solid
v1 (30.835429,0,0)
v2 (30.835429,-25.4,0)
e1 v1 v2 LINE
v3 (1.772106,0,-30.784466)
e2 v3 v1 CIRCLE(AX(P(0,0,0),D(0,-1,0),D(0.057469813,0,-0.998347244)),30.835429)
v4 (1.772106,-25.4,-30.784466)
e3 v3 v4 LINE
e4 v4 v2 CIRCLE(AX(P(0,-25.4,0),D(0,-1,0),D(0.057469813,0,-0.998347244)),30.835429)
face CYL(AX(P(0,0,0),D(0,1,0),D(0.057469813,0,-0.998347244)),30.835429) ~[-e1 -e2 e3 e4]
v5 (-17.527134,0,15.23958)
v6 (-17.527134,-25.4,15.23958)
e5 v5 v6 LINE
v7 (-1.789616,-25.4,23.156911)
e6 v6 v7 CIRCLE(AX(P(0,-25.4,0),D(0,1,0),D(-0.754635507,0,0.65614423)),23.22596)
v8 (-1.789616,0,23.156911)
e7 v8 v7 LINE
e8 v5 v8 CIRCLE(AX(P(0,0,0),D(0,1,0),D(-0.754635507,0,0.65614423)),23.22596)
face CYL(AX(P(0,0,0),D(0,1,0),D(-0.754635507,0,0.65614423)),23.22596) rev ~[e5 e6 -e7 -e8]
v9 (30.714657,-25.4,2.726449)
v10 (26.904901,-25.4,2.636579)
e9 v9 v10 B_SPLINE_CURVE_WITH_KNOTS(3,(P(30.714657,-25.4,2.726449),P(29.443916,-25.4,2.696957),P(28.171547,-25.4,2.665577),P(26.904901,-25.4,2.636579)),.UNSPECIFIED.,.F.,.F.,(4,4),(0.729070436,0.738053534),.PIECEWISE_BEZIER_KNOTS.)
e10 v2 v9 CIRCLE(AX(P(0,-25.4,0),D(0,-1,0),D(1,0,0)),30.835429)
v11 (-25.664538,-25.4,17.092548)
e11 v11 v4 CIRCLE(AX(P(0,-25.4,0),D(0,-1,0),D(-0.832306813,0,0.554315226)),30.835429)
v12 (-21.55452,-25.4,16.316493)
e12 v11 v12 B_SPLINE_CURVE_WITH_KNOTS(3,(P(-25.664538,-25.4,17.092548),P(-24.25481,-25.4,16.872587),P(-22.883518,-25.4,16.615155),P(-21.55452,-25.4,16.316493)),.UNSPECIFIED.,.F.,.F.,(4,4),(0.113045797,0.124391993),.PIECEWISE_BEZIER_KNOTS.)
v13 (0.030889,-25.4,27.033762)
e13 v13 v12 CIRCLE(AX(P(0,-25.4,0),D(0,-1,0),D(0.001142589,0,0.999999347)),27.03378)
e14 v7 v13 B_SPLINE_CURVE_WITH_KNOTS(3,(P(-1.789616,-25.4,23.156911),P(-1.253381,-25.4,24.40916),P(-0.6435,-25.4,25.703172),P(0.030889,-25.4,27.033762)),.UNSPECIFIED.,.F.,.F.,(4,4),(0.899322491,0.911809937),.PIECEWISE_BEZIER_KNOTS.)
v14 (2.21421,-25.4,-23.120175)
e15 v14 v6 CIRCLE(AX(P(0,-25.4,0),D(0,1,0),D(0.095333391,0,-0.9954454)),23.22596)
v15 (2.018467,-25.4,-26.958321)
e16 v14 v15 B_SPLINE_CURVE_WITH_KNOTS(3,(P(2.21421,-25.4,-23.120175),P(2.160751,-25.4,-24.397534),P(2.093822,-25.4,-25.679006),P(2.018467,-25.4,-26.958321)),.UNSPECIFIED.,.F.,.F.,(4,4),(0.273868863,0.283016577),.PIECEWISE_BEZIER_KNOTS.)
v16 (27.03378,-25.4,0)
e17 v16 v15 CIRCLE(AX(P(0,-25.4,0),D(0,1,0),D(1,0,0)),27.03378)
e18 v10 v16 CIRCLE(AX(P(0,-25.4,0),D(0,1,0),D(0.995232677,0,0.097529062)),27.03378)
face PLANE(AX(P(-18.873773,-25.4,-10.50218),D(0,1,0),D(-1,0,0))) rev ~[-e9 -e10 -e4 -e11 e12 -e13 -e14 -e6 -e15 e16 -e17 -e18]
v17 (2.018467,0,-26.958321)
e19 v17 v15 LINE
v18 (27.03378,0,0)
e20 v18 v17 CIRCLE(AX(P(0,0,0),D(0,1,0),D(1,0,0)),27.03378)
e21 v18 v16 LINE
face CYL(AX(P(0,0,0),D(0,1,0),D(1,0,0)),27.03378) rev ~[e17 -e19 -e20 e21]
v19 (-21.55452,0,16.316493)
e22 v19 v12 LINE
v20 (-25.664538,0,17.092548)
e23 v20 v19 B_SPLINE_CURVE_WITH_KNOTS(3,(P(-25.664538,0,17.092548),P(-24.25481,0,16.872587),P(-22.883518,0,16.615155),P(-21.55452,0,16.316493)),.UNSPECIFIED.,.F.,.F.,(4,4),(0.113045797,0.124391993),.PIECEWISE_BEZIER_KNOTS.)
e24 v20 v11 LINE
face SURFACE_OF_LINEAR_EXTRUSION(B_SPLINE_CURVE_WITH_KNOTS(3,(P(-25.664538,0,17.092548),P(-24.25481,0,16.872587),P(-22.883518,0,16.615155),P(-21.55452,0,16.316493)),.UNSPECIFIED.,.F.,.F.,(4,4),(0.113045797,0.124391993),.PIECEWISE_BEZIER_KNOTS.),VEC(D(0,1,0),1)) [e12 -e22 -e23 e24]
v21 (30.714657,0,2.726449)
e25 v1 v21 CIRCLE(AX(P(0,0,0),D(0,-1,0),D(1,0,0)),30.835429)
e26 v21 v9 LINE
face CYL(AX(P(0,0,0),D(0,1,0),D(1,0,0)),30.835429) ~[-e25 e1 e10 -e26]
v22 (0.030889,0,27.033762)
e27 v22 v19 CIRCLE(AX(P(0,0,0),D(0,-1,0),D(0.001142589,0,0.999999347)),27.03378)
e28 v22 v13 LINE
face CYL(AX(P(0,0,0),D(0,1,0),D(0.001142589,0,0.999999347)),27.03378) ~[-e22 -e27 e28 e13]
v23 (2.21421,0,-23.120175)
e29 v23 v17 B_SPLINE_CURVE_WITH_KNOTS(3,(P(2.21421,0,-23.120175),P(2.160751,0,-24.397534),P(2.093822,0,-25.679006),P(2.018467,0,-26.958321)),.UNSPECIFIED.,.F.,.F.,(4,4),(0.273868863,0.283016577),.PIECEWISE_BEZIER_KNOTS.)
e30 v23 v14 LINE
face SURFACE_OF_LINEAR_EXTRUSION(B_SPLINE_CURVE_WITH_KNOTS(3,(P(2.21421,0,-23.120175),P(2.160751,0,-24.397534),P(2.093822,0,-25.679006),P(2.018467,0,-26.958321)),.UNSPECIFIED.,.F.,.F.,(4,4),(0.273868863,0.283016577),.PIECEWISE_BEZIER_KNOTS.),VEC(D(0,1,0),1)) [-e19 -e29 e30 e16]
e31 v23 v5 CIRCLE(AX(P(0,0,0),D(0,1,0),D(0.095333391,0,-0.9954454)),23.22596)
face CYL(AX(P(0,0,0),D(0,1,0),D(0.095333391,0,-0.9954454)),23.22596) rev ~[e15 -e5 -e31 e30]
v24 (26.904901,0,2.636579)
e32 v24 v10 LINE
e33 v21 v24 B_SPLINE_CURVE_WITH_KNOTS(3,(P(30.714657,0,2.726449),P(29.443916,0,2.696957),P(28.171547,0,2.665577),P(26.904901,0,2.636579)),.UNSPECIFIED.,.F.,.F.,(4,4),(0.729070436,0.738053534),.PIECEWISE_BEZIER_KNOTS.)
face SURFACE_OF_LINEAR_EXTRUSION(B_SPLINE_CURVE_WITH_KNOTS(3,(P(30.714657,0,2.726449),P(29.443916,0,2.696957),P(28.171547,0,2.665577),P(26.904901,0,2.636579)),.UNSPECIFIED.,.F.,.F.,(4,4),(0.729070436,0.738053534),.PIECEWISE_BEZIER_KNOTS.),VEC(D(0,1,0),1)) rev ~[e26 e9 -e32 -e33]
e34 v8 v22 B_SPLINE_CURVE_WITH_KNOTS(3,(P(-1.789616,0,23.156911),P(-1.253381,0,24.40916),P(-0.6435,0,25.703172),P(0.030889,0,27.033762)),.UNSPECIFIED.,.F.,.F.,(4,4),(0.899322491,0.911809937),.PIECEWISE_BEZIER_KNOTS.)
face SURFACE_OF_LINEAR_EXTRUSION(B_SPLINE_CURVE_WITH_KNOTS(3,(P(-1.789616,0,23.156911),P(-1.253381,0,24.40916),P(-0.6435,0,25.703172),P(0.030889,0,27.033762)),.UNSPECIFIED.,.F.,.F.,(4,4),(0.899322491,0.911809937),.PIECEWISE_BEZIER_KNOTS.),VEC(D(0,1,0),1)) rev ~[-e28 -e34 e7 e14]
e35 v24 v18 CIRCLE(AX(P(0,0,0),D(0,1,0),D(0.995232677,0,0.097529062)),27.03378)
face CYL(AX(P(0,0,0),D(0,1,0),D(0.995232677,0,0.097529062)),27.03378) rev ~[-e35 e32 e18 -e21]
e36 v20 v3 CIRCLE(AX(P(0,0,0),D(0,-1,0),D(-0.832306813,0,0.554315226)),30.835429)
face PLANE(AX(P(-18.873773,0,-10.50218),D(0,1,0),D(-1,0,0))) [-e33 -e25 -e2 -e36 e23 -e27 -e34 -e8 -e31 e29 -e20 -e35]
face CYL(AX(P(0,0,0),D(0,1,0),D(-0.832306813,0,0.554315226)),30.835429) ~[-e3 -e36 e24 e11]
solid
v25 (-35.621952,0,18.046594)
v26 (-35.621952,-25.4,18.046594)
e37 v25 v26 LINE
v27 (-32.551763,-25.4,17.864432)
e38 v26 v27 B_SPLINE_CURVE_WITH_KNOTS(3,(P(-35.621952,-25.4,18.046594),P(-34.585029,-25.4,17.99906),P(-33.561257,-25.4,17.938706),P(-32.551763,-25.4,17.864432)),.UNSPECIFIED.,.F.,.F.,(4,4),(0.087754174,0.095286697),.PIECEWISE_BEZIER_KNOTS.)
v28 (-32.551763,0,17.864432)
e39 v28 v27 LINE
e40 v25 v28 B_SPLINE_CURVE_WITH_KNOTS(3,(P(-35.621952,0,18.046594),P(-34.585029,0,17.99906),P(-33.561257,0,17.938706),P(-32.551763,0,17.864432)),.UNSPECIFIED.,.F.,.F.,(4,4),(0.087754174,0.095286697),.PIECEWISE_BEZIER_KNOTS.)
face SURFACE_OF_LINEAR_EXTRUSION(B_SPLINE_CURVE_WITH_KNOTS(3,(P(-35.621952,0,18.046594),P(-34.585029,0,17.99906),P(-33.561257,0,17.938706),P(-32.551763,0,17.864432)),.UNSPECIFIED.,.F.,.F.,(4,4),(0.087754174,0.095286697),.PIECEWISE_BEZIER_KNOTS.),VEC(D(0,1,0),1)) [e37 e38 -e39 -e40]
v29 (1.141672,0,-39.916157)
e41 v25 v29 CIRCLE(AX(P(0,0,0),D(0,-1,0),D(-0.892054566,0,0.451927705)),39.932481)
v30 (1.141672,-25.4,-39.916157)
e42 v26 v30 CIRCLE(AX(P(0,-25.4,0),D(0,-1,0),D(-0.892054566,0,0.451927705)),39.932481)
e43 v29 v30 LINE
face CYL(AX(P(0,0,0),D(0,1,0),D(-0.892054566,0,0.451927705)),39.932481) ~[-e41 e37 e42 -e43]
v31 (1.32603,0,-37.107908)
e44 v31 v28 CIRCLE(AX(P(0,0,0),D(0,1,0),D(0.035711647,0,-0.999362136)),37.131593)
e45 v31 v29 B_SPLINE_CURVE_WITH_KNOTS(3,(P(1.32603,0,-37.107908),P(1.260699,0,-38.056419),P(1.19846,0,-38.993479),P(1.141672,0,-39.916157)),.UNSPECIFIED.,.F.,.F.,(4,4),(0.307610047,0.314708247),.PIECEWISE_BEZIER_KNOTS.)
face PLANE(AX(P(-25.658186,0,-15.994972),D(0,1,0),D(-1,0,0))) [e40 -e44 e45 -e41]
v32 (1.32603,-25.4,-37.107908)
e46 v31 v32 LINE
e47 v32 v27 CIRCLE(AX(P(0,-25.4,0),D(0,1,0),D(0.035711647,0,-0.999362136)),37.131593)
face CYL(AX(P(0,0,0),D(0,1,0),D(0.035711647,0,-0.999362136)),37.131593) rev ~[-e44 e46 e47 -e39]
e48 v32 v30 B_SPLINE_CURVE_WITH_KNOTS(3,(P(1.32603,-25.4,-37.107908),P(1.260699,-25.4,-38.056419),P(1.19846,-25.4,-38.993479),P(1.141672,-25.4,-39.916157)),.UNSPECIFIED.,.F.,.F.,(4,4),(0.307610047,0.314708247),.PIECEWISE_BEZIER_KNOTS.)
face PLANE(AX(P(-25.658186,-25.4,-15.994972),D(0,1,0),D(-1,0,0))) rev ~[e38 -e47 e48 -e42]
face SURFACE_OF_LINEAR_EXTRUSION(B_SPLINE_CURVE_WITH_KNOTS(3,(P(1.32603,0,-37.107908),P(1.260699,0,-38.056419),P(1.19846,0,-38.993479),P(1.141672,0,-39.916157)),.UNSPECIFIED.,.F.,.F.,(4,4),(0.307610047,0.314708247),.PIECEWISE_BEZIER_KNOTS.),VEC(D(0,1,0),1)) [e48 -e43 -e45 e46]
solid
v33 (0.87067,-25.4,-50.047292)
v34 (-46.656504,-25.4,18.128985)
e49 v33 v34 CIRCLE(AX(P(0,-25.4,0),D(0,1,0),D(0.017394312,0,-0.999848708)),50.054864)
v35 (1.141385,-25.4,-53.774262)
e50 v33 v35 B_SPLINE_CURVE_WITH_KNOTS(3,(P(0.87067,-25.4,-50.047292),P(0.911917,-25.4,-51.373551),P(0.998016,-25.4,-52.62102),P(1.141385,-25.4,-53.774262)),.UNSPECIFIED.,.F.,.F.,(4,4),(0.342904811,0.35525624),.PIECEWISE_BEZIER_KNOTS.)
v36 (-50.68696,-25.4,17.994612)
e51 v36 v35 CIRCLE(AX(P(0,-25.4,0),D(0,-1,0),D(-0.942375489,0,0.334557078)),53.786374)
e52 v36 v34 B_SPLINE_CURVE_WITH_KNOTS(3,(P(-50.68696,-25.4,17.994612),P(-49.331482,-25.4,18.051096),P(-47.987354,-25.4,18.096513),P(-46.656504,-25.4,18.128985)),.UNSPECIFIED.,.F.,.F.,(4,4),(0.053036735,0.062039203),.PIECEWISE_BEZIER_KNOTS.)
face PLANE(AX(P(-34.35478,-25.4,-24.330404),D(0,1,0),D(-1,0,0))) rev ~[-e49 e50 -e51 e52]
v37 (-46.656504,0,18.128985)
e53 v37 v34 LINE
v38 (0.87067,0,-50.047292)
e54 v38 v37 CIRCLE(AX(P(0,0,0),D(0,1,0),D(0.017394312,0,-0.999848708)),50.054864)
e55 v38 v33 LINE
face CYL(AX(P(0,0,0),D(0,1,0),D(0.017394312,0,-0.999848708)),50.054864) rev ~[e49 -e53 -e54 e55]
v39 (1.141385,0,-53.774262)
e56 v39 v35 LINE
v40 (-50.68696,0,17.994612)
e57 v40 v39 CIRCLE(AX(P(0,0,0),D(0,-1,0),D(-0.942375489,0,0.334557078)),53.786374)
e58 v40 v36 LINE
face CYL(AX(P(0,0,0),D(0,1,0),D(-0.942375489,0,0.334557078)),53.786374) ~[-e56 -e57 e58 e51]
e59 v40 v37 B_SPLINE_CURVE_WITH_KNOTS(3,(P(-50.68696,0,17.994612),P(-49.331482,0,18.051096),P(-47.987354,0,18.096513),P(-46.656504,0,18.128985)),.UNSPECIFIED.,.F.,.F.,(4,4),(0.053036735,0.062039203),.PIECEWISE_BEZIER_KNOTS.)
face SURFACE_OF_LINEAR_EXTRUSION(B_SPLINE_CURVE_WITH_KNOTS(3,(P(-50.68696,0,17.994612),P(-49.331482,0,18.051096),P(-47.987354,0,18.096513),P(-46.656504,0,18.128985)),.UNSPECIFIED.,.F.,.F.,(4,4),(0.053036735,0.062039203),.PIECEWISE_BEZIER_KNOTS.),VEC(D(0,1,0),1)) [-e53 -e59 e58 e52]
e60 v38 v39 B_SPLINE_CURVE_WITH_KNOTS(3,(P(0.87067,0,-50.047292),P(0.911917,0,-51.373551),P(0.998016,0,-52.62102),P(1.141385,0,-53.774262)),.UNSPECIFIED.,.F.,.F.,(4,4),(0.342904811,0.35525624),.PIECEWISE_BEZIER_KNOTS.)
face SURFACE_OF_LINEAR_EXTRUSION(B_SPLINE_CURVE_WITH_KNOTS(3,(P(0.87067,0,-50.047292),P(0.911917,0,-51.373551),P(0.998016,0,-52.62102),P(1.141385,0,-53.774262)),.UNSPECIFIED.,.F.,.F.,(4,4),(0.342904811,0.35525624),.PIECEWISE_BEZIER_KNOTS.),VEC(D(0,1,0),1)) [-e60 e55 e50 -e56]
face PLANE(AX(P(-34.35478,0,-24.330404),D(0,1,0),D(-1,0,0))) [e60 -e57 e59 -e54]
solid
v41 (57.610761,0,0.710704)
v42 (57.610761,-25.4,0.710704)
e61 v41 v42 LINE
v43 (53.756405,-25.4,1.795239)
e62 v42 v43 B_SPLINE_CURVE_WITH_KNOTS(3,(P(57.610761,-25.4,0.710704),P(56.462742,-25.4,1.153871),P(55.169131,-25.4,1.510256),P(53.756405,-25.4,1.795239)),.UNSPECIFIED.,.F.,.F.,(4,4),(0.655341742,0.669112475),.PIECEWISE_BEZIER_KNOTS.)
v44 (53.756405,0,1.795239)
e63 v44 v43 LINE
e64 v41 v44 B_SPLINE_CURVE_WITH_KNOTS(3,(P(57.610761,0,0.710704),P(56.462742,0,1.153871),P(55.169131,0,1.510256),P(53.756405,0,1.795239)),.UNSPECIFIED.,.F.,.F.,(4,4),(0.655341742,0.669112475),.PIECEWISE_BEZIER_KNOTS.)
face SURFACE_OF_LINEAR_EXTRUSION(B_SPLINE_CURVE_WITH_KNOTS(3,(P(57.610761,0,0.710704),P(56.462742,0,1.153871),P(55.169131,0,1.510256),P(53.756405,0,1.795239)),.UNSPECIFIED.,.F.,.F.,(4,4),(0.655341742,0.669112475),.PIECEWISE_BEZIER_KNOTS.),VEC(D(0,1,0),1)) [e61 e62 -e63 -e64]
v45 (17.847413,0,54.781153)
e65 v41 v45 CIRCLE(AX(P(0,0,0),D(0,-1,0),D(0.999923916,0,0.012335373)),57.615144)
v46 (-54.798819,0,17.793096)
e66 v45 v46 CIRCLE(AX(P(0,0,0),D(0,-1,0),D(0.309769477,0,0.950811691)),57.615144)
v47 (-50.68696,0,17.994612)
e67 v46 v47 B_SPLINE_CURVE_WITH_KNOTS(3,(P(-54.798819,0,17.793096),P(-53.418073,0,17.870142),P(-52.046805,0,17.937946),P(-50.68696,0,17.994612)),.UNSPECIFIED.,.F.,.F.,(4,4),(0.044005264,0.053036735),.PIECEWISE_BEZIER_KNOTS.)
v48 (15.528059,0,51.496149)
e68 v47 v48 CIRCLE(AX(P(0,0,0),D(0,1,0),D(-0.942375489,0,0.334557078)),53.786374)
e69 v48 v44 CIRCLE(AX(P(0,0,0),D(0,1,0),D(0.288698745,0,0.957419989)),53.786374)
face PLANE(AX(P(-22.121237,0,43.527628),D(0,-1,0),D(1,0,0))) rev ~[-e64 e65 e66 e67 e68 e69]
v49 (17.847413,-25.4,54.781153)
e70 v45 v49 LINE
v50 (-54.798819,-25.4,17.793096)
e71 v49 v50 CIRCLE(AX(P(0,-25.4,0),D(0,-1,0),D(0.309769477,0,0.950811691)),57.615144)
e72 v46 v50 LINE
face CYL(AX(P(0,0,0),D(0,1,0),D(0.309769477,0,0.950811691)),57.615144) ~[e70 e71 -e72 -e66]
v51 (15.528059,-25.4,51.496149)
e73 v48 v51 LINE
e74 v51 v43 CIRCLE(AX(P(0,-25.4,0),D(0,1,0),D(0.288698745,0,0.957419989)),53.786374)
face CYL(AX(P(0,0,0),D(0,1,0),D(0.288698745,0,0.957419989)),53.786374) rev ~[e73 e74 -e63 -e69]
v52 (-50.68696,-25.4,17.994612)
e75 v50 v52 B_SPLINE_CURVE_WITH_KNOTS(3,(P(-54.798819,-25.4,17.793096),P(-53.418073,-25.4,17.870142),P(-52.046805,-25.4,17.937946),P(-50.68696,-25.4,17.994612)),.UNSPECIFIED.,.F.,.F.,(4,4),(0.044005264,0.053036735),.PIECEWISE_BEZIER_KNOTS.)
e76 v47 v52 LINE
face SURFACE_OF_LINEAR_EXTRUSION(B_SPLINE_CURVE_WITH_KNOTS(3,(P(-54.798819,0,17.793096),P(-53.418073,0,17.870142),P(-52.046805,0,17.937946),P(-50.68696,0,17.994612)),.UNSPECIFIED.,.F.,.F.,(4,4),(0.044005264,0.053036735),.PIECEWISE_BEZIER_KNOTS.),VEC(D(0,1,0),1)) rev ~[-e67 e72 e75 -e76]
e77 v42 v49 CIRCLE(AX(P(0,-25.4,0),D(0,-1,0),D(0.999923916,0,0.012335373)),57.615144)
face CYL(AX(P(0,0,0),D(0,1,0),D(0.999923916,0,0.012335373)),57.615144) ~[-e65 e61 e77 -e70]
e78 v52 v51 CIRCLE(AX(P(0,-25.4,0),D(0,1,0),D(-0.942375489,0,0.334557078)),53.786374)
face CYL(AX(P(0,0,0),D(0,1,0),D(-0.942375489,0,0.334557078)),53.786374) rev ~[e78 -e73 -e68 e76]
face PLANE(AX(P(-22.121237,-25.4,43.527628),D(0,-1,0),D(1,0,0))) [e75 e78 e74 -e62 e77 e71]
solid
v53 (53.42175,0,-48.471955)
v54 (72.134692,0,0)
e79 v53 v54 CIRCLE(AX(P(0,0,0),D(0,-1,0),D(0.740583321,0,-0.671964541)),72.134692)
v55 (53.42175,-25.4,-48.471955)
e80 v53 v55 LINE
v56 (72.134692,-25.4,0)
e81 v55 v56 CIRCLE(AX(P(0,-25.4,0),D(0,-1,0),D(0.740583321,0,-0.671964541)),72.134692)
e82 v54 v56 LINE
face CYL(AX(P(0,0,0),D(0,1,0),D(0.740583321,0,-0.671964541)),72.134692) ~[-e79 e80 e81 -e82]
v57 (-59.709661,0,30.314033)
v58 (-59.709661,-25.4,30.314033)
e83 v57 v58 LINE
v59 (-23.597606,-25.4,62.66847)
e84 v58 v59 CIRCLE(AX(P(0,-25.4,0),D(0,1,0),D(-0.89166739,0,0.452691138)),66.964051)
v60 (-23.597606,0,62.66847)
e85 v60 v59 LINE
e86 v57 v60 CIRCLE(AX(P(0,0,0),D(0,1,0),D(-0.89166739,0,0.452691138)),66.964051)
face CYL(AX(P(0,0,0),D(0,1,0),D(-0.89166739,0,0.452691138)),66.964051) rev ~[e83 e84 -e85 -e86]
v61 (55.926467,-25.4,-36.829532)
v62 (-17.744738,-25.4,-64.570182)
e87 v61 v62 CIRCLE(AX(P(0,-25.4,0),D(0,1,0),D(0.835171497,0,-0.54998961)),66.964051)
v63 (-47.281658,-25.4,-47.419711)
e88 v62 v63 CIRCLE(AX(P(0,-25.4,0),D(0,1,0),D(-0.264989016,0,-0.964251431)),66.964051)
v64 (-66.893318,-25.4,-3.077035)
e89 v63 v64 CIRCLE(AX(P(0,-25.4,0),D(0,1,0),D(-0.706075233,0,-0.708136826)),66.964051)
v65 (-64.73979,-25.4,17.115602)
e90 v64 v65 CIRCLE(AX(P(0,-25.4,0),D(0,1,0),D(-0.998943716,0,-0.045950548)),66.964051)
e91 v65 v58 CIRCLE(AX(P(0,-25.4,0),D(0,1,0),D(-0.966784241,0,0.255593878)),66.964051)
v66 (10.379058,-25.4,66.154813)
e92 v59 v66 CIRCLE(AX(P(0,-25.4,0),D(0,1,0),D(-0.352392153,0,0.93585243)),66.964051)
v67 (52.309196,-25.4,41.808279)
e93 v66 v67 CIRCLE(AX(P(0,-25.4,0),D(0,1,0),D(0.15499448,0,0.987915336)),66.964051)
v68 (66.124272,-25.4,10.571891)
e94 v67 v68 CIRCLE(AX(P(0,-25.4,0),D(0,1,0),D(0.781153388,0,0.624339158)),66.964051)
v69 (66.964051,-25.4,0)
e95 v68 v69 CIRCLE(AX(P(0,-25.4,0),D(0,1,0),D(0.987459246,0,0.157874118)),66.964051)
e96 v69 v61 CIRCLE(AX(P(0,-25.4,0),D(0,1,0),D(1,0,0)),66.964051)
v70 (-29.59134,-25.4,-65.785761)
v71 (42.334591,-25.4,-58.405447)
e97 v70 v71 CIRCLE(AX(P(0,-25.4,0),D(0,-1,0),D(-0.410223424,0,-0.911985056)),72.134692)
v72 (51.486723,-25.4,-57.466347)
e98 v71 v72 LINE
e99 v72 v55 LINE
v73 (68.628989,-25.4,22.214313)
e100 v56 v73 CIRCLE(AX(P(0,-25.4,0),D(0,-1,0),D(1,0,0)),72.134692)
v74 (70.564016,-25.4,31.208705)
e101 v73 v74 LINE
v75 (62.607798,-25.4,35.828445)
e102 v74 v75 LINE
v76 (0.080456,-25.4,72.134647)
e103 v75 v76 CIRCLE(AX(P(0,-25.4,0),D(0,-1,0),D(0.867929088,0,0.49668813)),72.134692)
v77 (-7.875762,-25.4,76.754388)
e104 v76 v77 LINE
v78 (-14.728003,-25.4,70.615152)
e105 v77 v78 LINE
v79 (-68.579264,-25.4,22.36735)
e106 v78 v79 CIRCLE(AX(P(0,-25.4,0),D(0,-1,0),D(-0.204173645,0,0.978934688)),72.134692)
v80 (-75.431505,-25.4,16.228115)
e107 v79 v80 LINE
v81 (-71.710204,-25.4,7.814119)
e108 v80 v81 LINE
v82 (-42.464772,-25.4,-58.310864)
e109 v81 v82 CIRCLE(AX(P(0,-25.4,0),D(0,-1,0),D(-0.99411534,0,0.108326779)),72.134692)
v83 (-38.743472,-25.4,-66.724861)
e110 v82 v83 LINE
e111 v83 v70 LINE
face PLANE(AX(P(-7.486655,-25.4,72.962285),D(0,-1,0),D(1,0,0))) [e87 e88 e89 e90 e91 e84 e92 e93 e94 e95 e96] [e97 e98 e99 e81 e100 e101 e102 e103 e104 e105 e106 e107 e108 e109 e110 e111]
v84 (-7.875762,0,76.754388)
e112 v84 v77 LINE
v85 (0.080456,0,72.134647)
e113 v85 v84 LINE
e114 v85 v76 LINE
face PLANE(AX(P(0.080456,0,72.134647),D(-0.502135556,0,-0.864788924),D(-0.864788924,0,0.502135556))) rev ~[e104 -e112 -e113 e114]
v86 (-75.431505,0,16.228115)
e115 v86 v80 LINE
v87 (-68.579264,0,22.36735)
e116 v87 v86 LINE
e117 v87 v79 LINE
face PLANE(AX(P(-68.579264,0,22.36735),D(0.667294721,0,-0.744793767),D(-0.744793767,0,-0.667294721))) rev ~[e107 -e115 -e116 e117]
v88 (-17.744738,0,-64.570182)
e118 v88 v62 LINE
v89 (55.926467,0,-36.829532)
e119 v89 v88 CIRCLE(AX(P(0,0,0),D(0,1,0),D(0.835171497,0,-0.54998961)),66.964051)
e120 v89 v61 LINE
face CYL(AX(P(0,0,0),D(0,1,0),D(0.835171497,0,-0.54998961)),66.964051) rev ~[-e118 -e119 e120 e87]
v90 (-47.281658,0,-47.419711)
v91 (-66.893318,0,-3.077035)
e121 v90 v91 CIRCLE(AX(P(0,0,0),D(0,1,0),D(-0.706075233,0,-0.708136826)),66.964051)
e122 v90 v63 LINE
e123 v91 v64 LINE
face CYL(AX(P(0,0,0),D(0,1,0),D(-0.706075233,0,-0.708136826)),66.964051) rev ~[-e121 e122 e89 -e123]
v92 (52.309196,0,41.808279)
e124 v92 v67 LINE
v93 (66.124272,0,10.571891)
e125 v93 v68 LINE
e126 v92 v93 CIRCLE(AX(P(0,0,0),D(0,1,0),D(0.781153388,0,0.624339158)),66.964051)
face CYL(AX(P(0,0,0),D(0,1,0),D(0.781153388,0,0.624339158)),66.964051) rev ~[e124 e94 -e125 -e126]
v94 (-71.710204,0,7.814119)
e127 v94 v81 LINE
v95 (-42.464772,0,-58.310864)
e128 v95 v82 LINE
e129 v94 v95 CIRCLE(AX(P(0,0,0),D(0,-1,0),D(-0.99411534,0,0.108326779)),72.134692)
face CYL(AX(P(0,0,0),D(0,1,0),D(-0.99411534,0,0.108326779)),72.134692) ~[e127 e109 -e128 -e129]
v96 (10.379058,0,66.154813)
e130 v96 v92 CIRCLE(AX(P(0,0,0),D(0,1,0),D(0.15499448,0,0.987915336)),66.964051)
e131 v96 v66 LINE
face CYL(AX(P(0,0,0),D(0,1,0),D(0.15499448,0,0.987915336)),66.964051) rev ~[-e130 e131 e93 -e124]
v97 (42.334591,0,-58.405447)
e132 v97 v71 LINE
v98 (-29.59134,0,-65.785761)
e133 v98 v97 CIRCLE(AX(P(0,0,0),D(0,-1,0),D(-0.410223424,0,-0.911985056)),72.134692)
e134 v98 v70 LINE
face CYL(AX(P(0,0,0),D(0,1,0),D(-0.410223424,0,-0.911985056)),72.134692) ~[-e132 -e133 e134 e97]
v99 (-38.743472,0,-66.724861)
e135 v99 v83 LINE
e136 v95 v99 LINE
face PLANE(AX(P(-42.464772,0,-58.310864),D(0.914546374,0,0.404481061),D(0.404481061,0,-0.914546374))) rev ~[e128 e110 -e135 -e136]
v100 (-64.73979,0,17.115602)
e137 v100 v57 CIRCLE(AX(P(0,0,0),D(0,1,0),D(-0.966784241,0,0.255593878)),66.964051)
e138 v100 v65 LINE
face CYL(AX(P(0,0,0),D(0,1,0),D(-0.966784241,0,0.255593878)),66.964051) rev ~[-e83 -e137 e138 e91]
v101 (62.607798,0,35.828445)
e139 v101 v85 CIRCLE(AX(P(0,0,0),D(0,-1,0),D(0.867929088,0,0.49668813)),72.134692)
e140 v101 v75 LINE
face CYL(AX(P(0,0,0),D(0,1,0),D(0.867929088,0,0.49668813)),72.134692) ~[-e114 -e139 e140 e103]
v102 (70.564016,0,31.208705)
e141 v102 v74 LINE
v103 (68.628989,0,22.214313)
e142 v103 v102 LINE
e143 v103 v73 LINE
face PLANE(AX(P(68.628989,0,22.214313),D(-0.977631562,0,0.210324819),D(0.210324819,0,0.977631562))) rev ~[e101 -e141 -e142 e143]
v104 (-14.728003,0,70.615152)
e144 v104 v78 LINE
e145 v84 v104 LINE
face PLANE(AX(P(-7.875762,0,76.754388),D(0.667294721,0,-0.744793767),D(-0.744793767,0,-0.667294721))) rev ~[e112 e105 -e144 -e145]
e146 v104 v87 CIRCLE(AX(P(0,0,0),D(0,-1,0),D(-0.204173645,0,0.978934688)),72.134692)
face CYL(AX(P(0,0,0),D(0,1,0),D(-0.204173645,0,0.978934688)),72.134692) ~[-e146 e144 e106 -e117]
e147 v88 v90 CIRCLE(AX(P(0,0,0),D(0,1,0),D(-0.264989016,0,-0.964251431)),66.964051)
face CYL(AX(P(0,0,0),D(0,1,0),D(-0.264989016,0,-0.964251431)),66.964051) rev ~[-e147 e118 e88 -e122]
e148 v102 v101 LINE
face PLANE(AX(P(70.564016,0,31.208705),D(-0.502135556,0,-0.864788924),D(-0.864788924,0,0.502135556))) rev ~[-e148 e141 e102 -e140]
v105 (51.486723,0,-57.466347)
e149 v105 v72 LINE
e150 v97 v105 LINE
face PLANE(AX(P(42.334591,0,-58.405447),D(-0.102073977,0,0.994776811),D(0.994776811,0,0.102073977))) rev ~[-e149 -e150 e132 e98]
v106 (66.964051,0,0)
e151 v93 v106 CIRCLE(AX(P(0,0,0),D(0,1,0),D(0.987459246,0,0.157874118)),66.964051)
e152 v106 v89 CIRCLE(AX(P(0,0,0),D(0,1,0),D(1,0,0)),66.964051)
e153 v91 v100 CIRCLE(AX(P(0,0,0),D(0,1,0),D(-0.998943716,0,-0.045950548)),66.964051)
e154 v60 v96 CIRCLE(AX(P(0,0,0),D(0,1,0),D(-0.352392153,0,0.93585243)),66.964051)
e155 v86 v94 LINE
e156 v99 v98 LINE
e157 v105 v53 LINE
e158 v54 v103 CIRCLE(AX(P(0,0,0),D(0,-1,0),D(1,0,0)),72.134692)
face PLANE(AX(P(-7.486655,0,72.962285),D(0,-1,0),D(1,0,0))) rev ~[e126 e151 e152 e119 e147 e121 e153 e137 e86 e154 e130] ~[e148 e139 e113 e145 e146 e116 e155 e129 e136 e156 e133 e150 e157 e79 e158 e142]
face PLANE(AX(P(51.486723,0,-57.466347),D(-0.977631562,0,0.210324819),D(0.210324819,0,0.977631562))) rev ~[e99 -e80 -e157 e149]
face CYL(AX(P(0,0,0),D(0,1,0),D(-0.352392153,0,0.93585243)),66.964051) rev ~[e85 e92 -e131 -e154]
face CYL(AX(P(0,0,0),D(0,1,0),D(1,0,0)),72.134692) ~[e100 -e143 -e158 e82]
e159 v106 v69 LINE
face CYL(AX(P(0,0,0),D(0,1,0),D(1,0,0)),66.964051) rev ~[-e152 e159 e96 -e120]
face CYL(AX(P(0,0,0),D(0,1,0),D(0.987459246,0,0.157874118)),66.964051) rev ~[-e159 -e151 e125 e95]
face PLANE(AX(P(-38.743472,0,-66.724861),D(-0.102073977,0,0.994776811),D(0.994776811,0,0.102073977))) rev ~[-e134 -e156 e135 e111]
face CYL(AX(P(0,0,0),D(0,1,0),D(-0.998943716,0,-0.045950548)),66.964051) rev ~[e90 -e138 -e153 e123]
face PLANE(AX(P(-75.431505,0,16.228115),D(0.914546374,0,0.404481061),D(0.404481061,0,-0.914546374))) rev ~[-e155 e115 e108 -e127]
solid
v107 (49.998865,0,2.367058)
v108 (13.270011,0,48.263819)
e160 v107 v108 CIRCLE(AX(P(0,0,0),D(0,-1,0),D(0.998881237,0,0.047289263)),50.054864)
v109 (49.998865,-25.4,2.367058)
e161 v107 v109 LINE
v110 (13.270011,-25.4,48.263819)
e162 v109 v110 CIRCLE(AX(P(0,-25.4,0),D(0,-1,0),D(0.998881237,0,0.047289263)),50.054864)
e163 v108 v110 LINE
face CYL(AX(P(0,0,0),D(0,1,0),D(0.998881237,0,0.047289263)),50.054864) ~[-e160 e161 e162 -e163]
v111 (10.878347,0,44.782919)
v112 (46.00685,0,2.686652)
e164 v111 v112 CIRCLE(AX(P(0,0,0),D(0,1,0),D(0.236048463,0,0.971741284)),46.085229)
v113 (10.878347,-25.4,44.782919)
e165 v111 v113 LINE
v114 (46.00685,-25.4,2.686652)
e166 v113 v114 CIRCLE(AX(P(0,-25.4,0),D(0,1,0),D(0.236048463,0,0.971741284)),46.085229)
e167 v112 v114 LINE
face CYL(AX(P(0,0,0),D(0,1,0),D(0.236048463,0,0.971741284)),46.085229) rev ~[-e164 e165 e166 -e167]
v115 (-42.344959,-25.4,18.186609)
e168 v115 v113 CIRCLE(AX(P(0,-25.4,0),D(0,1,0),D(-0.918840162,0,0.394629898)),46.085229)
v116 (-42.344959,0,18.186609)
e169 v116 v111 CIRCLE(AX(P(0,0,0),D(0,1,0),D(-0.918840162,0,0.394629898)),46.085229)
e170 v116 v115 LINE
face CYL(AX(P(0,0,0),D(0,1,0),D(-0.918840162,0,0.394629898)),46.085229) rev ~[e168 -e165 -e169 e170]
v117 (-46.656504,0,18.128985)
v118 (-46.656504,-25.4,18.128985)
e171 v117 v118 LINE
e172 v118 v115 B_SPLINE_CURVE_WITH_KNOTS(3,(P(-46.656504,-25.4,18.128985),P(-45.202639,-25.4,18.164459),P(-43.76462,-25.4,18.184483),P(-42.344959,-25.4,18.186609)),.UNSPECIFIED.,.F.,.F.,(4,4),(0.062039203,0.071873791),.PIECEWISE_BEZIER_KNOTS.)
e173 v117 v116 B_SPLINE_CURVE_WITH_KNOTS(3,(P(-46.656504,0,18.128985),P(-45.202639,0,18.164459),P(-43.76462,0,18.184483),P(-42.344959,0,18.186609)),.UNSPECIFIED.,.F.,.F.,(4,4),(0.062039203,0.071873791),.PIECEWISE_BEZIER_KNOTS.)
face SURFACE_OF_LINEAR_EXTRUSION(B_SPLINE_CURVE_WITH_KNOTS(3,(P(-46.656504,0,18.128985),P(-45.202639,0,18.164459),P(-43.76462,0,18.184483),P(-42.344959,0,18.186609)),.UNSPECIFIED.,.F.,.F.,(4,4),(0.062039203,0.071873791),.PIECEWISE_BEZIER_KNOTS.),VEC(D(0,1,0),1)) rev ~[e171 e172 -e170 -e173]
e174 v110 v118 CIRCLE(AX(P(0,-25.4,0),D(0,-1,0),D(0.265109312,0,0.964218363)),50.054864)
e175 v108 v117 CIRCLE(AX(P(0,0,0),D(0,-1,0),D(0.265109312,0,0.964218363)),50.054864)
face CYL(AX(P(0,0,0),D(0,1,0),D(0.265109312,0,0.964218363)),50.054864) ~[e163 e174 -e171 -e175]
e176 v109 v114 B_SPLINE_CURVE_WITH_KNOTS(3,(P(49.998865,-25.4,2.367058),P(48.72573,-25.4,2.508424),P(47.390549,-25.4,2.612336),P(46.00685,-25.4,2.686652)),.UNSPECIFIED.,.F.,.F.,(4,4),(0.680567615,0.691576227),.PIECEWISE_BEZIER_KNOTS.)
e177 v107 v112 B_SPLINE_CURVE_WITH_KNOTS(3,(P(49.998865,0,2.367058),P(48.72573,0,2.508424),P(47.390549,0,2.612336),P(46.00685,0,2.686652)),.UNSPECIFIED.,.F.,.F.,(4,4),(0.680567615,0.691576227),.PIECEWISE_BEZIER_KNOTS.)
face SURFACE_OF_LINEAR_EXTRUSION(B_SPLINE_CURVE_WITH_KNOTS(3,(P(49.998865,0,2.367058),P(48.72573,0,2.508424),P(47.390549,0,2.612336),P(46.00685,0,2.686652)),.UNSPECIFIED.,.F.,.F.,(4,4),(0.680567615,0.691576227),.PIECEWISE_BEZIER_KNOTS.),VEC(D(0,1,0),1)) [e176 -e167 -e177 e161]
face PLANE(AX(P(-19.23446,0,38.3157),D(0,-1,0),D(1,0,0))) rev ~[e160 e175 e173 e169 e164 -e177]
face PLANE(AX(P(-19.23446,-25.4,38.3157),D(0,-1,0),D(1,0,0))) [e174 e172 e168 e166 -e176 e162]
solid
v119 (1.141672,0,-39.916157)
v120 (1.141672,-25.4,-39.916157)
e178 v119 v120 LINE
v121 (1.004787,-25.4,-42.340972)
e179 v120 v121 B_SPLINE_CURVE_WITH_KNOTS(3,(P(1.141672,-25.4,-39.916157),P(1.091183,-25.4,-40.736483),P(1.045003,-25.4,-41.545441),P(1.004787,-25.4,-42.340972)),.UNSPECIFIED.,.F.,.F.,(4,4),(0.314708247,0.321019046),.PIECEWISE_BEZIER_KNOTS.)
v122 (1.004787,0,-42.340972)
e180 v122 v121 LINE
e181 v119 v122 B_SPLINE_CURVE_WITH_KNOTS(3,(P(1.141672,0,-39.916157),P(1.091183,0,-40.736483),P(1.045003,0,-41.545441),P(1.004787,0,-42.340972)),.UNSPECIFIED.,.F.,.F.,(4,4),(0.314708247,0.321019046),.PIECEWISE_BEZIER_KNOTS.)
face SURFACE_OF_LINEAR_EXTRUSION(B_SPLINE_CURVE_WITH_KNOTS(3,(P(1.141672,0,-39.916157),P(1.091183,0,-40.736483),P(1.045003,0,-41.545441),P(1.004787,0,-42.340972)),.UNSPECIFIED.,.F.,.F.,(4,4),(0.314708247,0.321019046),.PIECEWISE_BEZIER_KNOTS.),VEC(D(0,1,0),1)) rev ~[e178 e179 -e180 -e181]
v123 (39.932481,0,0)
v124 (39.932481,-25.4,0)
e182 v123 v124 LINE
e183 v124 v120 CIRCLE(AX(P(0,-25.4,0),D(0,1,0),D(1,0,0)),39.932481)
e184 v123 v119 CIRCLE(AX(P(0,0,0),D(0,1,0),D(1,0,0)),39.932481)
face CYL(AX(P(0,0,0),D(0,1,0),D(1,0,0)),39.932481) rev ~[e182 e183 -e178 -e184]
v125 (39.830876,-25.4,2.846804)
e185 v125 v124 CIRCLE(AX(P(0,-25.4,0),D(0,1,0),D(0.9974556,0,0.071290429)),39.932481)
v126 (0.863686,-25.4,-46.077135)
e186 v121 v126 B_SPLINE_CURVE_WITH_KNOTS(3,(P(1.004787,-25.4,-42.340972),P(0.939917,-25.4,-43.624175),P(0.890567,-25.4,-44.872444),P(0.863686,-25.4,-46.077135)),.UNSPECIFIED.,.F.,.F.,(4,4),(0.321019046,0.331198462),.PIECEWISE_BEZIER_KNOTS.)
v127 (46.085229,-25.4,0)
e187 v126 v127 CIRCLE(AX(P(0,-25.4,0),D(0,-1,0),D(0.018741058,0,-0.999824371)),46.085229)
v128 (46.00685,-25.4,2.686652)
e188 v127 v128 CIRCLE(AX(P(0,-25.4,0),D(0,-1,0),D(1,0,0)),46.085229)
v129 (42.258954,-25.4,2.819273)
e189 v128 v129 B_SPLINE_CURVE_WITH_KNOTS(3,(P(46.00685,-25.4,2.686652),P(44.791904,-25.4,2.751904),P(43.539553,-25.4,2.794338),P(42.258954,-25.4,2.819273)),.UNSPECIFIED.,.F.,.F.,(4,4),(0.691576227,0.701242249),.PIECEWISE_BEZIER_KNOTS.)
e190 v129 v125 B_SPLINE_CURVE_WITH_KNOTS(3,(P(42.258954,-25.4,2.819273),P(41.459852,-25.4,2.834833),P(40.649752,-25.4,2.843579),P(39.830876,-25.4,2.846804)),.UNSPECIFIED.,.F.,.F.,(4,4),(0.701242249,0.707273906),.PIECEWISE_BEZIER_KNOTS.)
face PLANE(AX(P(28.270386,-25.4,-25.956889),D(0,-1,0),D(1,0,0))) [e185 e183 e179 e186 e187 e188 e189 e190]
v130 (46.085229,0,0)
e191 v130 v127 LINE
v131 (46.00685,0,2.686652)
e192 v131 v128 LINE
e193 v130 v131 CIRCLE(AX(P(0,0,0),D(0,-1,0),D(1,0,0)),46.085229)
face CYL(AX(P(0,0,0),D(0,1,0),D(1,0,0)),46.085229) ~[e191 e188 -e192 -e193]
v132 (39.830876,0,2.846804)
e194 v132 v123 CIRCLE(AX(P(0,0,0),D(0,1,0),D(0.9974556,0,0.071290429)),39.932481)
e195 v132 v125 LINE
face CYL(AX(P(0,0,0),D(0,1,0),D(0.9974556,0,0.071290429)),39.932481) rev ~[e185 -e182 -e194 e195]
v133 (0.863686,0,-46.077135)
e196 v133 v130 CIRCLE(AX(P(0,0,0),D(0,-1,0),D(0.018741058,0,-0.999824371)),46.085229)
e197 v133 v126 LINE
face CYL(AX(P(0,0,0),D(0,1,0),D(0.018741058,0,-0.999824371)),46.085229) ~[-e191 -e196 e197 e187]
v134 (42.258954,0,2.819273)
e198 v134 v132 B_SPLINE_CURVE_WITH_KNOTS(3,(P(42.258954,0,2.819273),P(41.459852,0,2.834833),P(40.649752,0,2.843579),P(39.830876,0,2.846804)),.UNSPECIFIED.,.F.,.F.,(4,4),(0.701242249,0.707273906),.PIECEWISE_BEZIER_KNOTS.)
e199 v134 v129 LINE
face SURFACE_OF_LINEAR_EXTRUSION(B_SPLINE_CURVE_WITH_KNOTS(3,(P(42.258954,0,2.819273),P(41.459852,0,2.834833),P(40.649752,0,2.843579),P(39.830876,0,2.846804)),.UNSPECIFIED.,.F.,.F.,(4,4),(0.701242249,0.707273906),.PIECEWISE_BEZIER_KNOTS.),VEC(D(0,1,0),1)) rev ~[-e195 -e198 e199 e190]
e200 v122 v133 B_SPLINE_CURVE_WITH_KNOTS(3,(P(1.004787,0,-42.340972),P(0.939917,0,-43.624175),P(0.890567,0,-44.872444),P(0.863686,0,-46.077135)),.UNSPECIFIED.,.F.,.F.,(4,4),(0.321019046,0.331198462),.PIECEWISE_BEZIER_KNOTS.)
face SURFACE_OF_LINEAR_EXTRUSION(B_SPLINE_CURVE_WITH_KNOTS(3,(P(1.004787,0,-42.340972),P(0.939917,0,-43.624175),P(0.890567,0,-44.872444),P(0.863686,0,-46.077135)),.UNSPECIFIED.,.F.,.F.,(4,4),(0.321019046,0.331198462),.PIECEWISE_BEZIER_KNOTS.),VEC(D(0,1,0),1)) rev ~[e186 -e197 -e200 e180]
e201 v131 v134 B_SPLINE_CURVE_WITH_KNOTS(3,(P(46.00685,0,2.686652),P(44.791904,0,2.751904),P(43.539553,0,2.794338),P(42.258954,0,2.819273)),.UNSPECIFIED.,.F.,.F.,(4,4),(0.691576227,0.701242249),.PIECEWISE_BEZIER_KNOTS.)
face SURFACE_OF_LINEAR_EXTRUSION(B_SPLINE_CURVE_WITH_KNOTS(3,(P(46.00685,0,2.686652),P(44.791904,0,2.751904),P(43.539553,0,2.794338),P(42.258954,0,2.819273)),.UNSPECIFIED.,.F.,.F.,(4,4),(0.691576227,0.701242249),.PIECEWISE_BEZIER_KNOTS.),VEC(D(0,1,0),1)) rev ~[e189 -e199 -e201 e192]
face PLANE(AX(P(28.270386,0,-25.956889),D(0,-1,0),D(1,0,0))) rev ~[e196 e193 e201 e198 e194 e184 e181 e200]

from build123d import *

# Parameters (mm, degrees)
F1_DEPTH = 25.4


with BuildPart() as f1:
    # F0 (on Front) → F1 (new body)
    with BuildSketch(Plane.XZ):
        with BuildLine():
            Line((0.0804563043, 72.1346472531), (-7.8757622136, 76.7543875159))
            Line((-7.8757622136, 76.7543875159), (-14.7280030271, 70.6151523001))
            ThreePointArc((-14.7280030271, 70.6151523001), (-7.3630749336, 71.7579189711), (0.0804563043, 72.1346472531))
        make_face()
        with BuildLine():
            ThreePointArc((62.6077975156, 35.8284453721), (36.2213937543, 62.3812827861), (0.0804563043, 72.1346472531))
            Line((0.0804563043, 72.1346472531), (10.379058307, 66.1548132131))
            ThreePointArc((10.379058307, 66.1548132131), (33.6250311343, 57.9097698478), (52.3091955129, 41.808279412))
            Line((52.3091955129, 41.808279412), (62.6077975156, 35.8284453721))
        make_face()
        with BuildLine():
            Line((10.379058307, 66.1548132131), (0.0804563043, 72.1346472531))
            ThreePointArc((0.0804563043, 72.1346472531), (-7.3630749336, 71.7579189711), (-14.7280030271, 70.6151523001))
            Line((-14.7280030271, 70.6151523001), (-23.5976061943, 62.6684700986))
            ThreePointArc((-23.5976061943, 62.6684700986), (-6.8352870562, 66.6142853558), (10.379058307, 66.1548132131))
        make_face()
        with BuildLine():
            Line((-23.5976061943, 62.6684700986), (-14.7280030271, 70.6151523001))
            ThreePointArc((-14.7280030271, 70.6151523001), (-48.1350992585, 53.7254690711), (-68.5792639553, 22.3673503769))
            Line((-68.5792639553, 22.3673503769), (-59.7096607881, 30.3140325785))
            ThreePointArc((-59.7096607881, 30.3140325785), (-44.684757914, 49.8744079942), (-23.5976061943, 62.6684700986))
        make_face()
        with BuildLine():
            ThreePointArc((68.628988686, 22.214313392), (65.9705211479, 29.1771168386), (62.6077975156, 35.8284453721))
            Line((62.6077975156, 35.8284453721), (52.3091955129, 41.808279412))
            ThreePointArc((52.3091955129, 41.808279412), (61.2417303042, 27.0856905386), (66.1242715931, 10.5718905067))
            Line((66.1242715931, 10.5718905067), (68.628988686, 22.214313392))
        make_face()
        with BuildLine():
            Line((70.5640160335, 31.2087051093), (62.6077975156, 35.8284453721))
            ThreePointArc((62.6077975156, 35.8284453721), (65.9705211479, 29.1771168386), (68.628988686, 22.214313392))
            Line((68.628988686, 22.214313392), (70.5640160335, 31.2087051093))
        make_face()
        with BuildLine():
            ThreePointArc((-70.1811130337, 16.6740871082), (-69.4385618169, 19.5371425839), (-68.5792639553, 22.3673503769))
            Line((-68.5792639553, 22.3673503769), (-75.4315047689, 16.2281151612))
            add(Edge.make_bspline(
                [(-75.4315047689, 16.2281151612), (-73.6801810781, 16.3779407802), (-71.9288512089, 16.5277670762), (-70.1811130337, 16.6740871082)],
                knots=[0, 0, 0, 0, 0.0110848613, 0.0110848613, 0.0110848613, 0.0110848613], degree=3))
        make_face()
        with BuildLine():
            Line((-59.7096607881, 30.3140325785), (-68.5792639553, 22.3673503769))
            ThreePointArc((-68.5792639553, 22.3673503769), (-69.4385618169, 19.5371425839), (-70.1811130337, 16.6740871082))
            add(Edge.make_bspline(
                [(-70.1811130337, 16.6740871082), (-68.362095804, 16.8263745979), (-66.5469692067, 16.9748639956), (-64.7397895139, 17.1156015464)],
                knots=[0.0110848613, 0.0110848613, 0.0110848613, 0.0110848613, 0.0226218032, 0.0226218032, 0.0226218032, 0.0226218032], degree=3))
            ThreePointArc((-64.7397895139, 17.1156015464), (-62.5736850885, 23.8478111585), (-59.7096607881, 30.3140325785))
        make_face()
        with BuildLine():
            ThreePointArc((72.134692122, 0), (71.2528763526, 11.2446173352), (68.628988686, 22.214313392))
            Line((68.628988686, 22.214313392), (66.1242715931, 10.5718905067))
            ThreePointArc((66.1242715931, 10.5718905067), (66.7537762071, 5.3025960338), (66.9640512708, 0))
            ThreePointArc((66.9640512708, 0), (64.145330939, -19.223961125), (55.9264669455, -36.8295324108))
            Line((55.9264669455, -36.8295324108), (53.4217498526, -48.4719552961))
            ThreePointArc((53.4217498526, -48.4719552961), (67.2940386876, -25.9793411127), (72.134692122, 0))
        make_face()
        with BuildLine():
            add(Edge.make_bspline(
                [(-75.4315047689, 16.2281151612), (-73.6801810781, 16.3779407802), (-71.9288512089, 16.5277670762), (-70.1811130337, 16.6740871082)],
                knots=[0, 0, 0, 0, 0.0110848613, 0.0110848613, 0.0110848613, 0.0110848613], degree=3))
            Line((-75.4315047689, 16.2281151612), (-71.7102039728, 7.8141188702))
            ThreePointArc((-71.7102039728, 7.8141188702), (-71.0838323373, 12.2679496162), (-70.1811130337, 16.6740871082))
        make_face()
        with BuildLine():
            add(Edge.make_bspline(
                [(-70.1811130337, 16.6740871082), (-68.362095804, 16.8263745979), (-66.5469692067, 16.9748639956), (-64.7397895139, 17.1156015464)],
                knots=[0.0110848613, 0.0110848613, 0.0110848613, 0.0110848613, 0.0226218032, 0.0226218032, 0.0226218032, 0.0226218032], degree=3))
            ThreePointArc((-70.1811130337, 16.6740871082), (-71.0838323373, 12.2679496162), (-71.7102039728, 7.8141188702))
            Line((-71.7102039728, 7.8141188702), (-66.8933181941, -3.0770348681))
            ThreePointArc((-66.8933181941, -3.0770348681), (-66.5864430839, 7.1013914157), (-64.7397895139, 17.1156015464))
        make_face()
        with BuildLine():
            Line((-66.8933181941, -3.0770348681), (-71.7102039728, 7.8141188702))
            ThreePointArc((-71.7102039728, 7.8141188702), (-65.9705211479, -29.1771168386), (-42.4647723522, -58.3108644818))
            Line((-42.4647723522, -58.3108644818), (-47.2816581308, -47.4197107436))
            ThreePointArc((-47.2816581308, -47.4197107436), (-61.2417303042, -27.0856905386), (-66.8933181941, -3.0770348681))
        make_face()
        with BuildLine():
            ThreePointArc((42.3345913172, -58.4054465401), (48.1350992585, -53.7254690711), (53.4217498526, -48.4719552961))
            Line((53.4217498526, -48.4719552961), (55.9264669455, -36.8295324108))
            ThreePointArc((55.9264669455, -36.8295324108), (44.684757914, -49.8744079942), (30.4879890188, -59.6210255547))
            Line((30.4879890188, -59.6210255547), (42.3345913172, -58.4054465401))
        make_face()
        with BuildLine():
            Line((51.486722505, -57.4663470135), (53.4217498526, -48.4719552961))
            ThreePointArc((53.4217498526, -48.4719552961), (48.1350992585, -53.7254690711), (42.3345913172, -58.4054465401))
            Line((42.3345913172, -58.4054465401), (51.486722505, -57.4663470135))
        make_face()
        with BuildLine():
            ThreePointArc((-29.5913403683, -65.7857612463), (-36.2213937543, -62.3812827861), (-42.4647723522, -58.3108644818))
            Line((-42.4647723522, -58.3108644818), (-38.7434715561, -66.7248607729))
            Line((-38.7434715561, -66.7248607729), (-29.5913403683, -65.7857612463))
        make_face()
        with BuildLine():
            Line((-47.2816581308, -47.4197107436), (-42.4647723522, -58.3108644818))
            ThreePointArc((-42.4647723522, -58.3108644818), (-36.2213937543, -62.3812827861), (-29.5913403683, -65.7857612463))
            Line((-29.5913403683, -65.7857612463), (-17.7447380699, -64.5701822317))
            ThreePointArc((-17.7447380699, -64.5701822317), (-33.6250311343, -57.9097698478), (-47.2816581308, -47.4197107436))
        make_face()
        with BuildLine():
            ThreePointArc((-29.5913403683, -65.7857612463), (7.3630749336, -71.7579189711), (42.3345913172, -58.4054465401))
            Line((42.3345913172, -58.4054465401), (30.4879890188, -59.6210255547))
            ThreePointArc((30.4879890188, -59.6210255547), (6.8352870562, -66.6142853558), (-17.7447380699, -64.5701822317))
            Line((-17.7447380699, -64.5701822317), (-29.5913403683, -65.7857612463))
        make_face()
    extrude(amount=F1_DEPTH)


with BuildPart() as f1b:
    # F0 (on Front) → F1, piece 2 (new body)
    with BuildSketch(Plane.XZ):
        with BuildLine():
            ThreePointArc((17.8474131482, 54.7811527956), (-26.1415508125, 51.3431999277), (-54.7988191164, 17.7930964463))
            add(Edge.make_bspline(
                [(-54.7988191164, 17.7930964463), (-53.4180734669, 17.8701419739), (-52.0468052053, 17.9379460939), (-50.6869602761, 17.9946120432)],
                knots=[0.0440052643, 0.0440052643, 0.0440052643, 0.0440052643, 0.0530367351, 0.0530367351, 0.0530367351, 0.0530367351], degree=3))
            ThreePointArc((-50.6869602761, 17.9946120432), (-24.2822021716, 47.9932147528), (15.5280586181, 51.4961493722))
            add(Edge.make_bspline(
                [(15.5280586181, 51.4961493722), (16.2953998908, 52.5878890346), (17.0695301608, 53.6834646207), (17.8474131482, 54.7811527956)],
                knots=[0.9806259826, 0.9806259826, 0.9806259826, 0.9806259826, 0.9892751554, 0.9892751554, 0.9892751554, 0.9892751554], degree=3))
        make_face()
        with BuildLine():
            add(Edge.make_bspline(
                [(57.6107607755, 0.7107042783), (56.462742198, 1.1538709295), (55.1691307112, 1.5102558583), (53.7564053874, 1.7952393804)],
                knots=[0.6553417422, 0.6553417422, 0.6553417422, 0.6553417422, 0.6691124751, 0.6691124751, 0.6691124751, 0.6691124751], degree=3))
            ThreePointArc((57.6107607755, 0.7107042783), (46.4153784181, 34.1338176009), (17.8474131482, 54.7811527956))
            add(Edge.make_bspline(
                [(15.5280586181, 51.4961493722), (16.2953998908, 52.5878890346), (17.0695301608, 53.6834646207), (17.8474131482, 54.7811527956)],
                knots=[0.9806259826, 0.9806259826, 0.9806259826, 0.9806259826, 0.9892751554, 0.9892751554, 0.9892751554, 0.9892751554], degree=3))
            ThreePointArc((15.5280586181, 51.4961493722), (42.6336645345, 32.7924481089), (53.7564053874, 1.7952393804))
        make_face()
    extrude(amount=F1_DEPTH)


with BuildPart() as f1c:
    # F0 (on Front) → F1, piece 3 (new body)
    with BuildSketch(Plane.XZ):
        with BuildLine():
            add(Edge.make_bspline(
                [(-50.6869602761, 17.9946120432), (-49.3314822975, 18.0510960178), (-47.9873544002, 18.0965132441), (-46.6565038412, 18.1289851741)],
                knots=[0.0530367351, 0.0530367351, 0.0530367351, 0.0530367351, 0.0620392027, 0.0620392027, 0.0620392027, 0.0620392027], degree=3))
            ThreePointArc((-50.6869602761, 17.9946120432), (-43.604859977, -31.4895250996), (1.141385438, -53.7742619093))
            add(Edge.make_bspline(
                [(0.8706699494, -50.0472915148), (0.9119172038, -51.3735505285), (0.9980162573, -52.6210201223), (1.141385438, -53.7742619093)],
                knots=[0.3429048112, 0.3429048112, 0.3429048112, 0.3429048112, 0.3552562401, 0.3552562401, 0.3552562401, 0.3552562401], degree=3))
            ThreePointArc((0.8706699494, -50.0472915148), (-41.0619875564, -28.6252097293), (-46.6565038412, 18.1289851741))
        make_face()
    extrude(amount=F1_DEPTH)


with BuildPart() as f1d:
    # F0 (on Front) → F1, piece 4 (new body)
    with BuildSketch(Plane.XZ):
        with BuildLine():
            ThreePointArc((13.2700106945, 48.2638194748), (-22.4875863699, 44.7191000959), (-46.6565038412, 18.1289851741))
            add(Edge.make_bspline(
                [(-46.6565038412, 18.1289851741), (-45.202639449, 18.1644585655), (-43.7646203485, 18.1844829268), (-42.3449591404, 18.1866091603)],
                knots=[0.0620392027, 0.0620392027, 0.0620392027, 0.0620392027, 0.0718737908, 0.0718737908, 0.0718737908, 0.0718737908], degree=3))
            ThreePointArc((-42.3449591404, 18.1866091603), (-20.6004330804, 41.2246343132), (10.878347446, 44.782919447))
            add(Edge.make_bspline(
                [(10.878347446, 44.782919447), (11.6616317718, 45.9353294378), (12.4601226636, 47.0963501665), (13.2700106945, 48.2638194748)],
                knots=[0.9627272628, 0.9627272628, 0.9627272628, 0.9627272628, 0.9720558065, 0.9720558065, 0.9720558065, 0.9720558065], degree=3))
        make_face()
        with BuildLine():
            add(Edge.make_bspline(
                [(49.9988649095, 2.3670576439), (48.7257298476, 2.5084241824), (47.3905488256, 2.6123363012), (46.0068497112, 2.6866516352)],
                knots=[0.6805676145, 0.6805676145, 0.6805676145, 0.6805676145, 0.6915762269, 0.6915762269, 0.6915762269, 0.6915762269], degree=3))
            ThreePointArc((49.9988649095, 2.3670576439), (39.0815281391, 31.2749678248), (13.2700106945, 48.2638194748))
            add(Edge.make_bspline(
                [(10.878347446, 44.782919447), (11.6616317718, 45.9353294378), (12.4601226636, 47.0963501665), (13.2700106945, 48.2638194748)],
                knots=[0.9627272628, 0.9627272628, 0.9627272628, 0.9627272628, 0.9720558065, 0.9720558065, 0.9720558065, 0.9720558065], degree=3))
            ThreePointArc((10.878347446, 44.782919447), (35.3836876939, 29.5269870209), (46.0068497112, 2.6866516352))
        make_face()
    extrude(amount=F1_DEPTH)


with BuildPart() as f1e:
    # F0 (on Front) → F1, piece 5 (new body)
    with BuildSketch(Plane.XZ):
        with BuildLine():
            ThreePointArc((46.0852288413, 0), (46.0656298913, 1.3438973451), (46.0068497112, 2.6866516352))
            add(Edge.make_bspline(
                [(46.0068497112, 2.6866516352), (44.7919040289, 2.751903606), (43.5395529627, 2.7943377156), (42.2589539711, 2.8192730553)],
                knots=[0.6915762269, 0.6915762269, 0.6915762269, 0.6915762269, 0.701242249, 0.701242249, 0.701242249, 0.701242249], degree=3))
            ThreePointArc((42.2589539711, 2.8192730553), (42.3294012483, 1.4104188191), (42.3528923604, 0))
            ThreePointArc((42.3528923604, 0), (30.301180763, -29.5906393249), (1.0047866298, -42.3409718254))
            add(Edge.make_bspline(
                [(1.0047866298, -42.3409718254), (0.9399173868, -43.6241751634), (0.8905666488, -44.8724435644), (0.8636859405, -46.0771349364)],
                knots=[0.3210190464, 0.3210190464, 0.3210190464, 0.3210190464, 0.3311984622, 0.3311984622, 0.3311984622, 0.3311984622], degree=3))
            ThreePointArc((0.8636859405, -46.0771349364), (32.8911194821, -32.28037448), (46.0852288413, 0))
        make_face()
        with BuildLine():
            ThreePointArc((42.3528923604, 0), (42.3294012483, 1.4104188191), (42.2589539711, 2.8192730553))
            add(Edge.make_bspline(
                [(42.2589539711, 2.8192730553), (41.4598523848, 2.8348328594), (40.6497515192, 2.8435789292), (39.8308764327, 2.8468036855)],
                knots=[0.701242249, 0.701242249, 0.701242249, 0.701242249, 0.7072739057, 0.7072739057, 0.7072739057, 0.7072739057], degree=3))
            ThreePointArc((39.8308764327, 2.8468036855), (39.9070714907, 1.4243081333), (39.9324806219, 0))
            ThreePointArc((39.9324806219, 0), (28.637325364, -27.8299587605), (1.1416721096, -39.9161570472))
            add(Edge.make_bspline(
                [(1.1416721096, -39.9161570472), (1.0911833961, -40.7364829506), (1.0450027701, -41.5454409513), (1.0047866298, -42.3409718254)],
                knots=[0.3147082465, 0.3147082465, 0.3147082465, 0.3147082465, 0.3210190464, 0.3210190464, 0.3210190464, 0.3210190464], degree=3))
            ThreePointArc((1.0047866298, -42.3409718254), (30.301180763, -29.5906393249), (42.3528923604, 0))
        make_face()
    extrude(amount=F1_DEPTH)


with BuildPart() as f1f:
    # F0 (on Front) → F1, piece 6 (new body)
    with BuildSketch(Plane.XZ):
        with BuildLine():
            add(Edge.make_bspline(
                [(-35.621951687, 18.0465943222), (-34.5850294785, 17.9990600754), (-33.5612567748, 17.9387061923), (-32.5517625301, 17.8644322516)],
                knots=[0.087754174, 0.087754174, 0.087754174, 0.087754174, 0.0952866965, 0.0952866965, 0.0952866965, 0.0952866965], degree=3))
            ThreePointArc((-35.621951687, 18.0465943222), (-33.7215443969, -21.3883251357), (1.1416721096, -39.9161570472))
            add(Edge.make_bspline(
                [(1.326030323, -37.1079078778), (1.26069871, -38.0564191035), (1.1984603116, -38.9934788882), (1.1416721096, -39.9161570472)],
                knots=[0.3076100467, 0.3076100467, 0.3076100467, 0.3076100467, 0.3147082465, 0.3147082465, 0.3147082465, 0.3147082465], degree=3))
            ThreePointArc((1.326030323, -37.1079078778), (-31.6109337539, -19.480863705), (-32.5517625301, 17.8644322516))
        make_face()
    extrude(amount=F1_DEPTH)


with BuildPart() as f1g:
    # F0 (on Front) → F1, piece 7 (new body)
    with BuildSketch(Plane.XZ):
        with BuildLine():
            add(Edge.make_bspline(
                [(-25.6645379323, 17.0925479942), (-24.2548098485, 16.8725866776), (-22.8835176436, 16.6151552991), (-21.5545197047, 16.3164929872)],
                knots=[0.1130457972, 0.1130457972, 0.1130457972, 0.1130457972, 0.1243919933, 0.1243919933, 0.1243919933, 0.1243919933], degree=3))
            ThreePointArc((-25.6645379323, 17.0925479942), (-26.75376959, -15.3316508223), (1.7721063726, -30.7844659401))
            add(Edge.make_bspline(
                [(2.0184674831, -26.9583206473), (1.9430941028, -28.2379532102), (1.8592908583, -29.5154271132), (1.7721063726, -30.7844659401)],
                knots=[0.2830165775, 0.2830165775, 0.2830165775, 0.2830165775, 0.2921665644, 0.2921665644, 0.2921665644, 0.2921665644], degree=3))
            ThreePointArc((2.0184674831, -26.9583206473), (-23.7400865179, -12.9318813491), (-21.5545197047, 16.3164929872))
        make_face()
        with BuildLine():
            ThreePointArc((30.8354293664, 0), (30.8052215855, 1.3645612049), (30.7146574284, 2.726448838))
            add(Edge.make_bspline(
                [(30.7146574284, 2.726448838), (29.4439156689, 2.6969565272), (28.1715468265, 2.6655768286), (26.9049012864, 2.6365791987)],
                knots=[0.7290704359, 0.7290704359, 0.7290704359, 0.7290704359, 0.7380535345, 0.7380535345, 0.7380535345, 0.7380535345], degree=3))
            ThreePointArc((26.9049012864, 2.6365791987), (27.0015411264, 1.3198635918), (27.0337800372, 0))
            ThreePointArc((27.0337800372, 0), (19.8165596037, -18.3882905289), (2.0184674831, -26.9583206473))
            add(Edge.make_bspline(
                [(2.0184674831, -26.9583206473), (1.9430941028, -28.2379532102), (1.8592908583, -29.5154271132), (1.7721063726, -30.7844659401)],
                knots=[0.2830165775, 0.2830165775, 0.2830165775, 0.2830165775, 0.2921665644, 0.2921665644, 0.2921665644, 0.2921665644], degree=3))
            ThreePointArc((1.7721063726, -30.7844659401), (22.4217234517, -21.1681369436), (30.8354293664, 0))
        make_face()
        with BuildLine():
            ThreePointArc((0.0308885054, 27.0337623908), (-12.0221312947, 24.2135008257), (-21.5545197047, 16.3164929872))
            add(Edge.make_bspline(
                [(-21.5545197047, 16.3164929872), (-20.1643054515, 16.0040736894), (-18.8203715182, 15.6465376189), (-17.5271344034, 15.2395798985)],
                knots=[0.1243919933, 0.1243919933, 0.1243919933, 0.1243919933, 0.136260818, 0.136260818, 0.136260818, 0.136260818], degree=3))
            ThreePointArc((-17.5271344034, 15.2395798985), (-10.4381626353, 20.7482528584), (-1.7896155874, 23.1569106732))
            add(Edge.make_bspline(
                [(-1.7896155874, 23.1569106732), (-1.2533807016, 24.4091596989), (-0.6435000896, 25.7031724079), (0.0308885054, 27.0337623908)],
                knots=[0.8993224909, 0.8993224909, 0.8993224909, 0.8993224909, 0.9118099368, 0.9118099368, 0.9118099368, 0.9118099368], degree=3))
        make_face()
        with BuildLine():
            add(Edge.make_bspline(
                [(-21.5545197047, 16.3164929872), (-20.1643054515, 16.0040736894), (-18.8203715182, 15.6465376189), (-17.5271344034, 15.2395798985)],
                knots=[0.1243919933, 0.1243919933, 0.1243919933, 0.1243919933, 0.136260818, 0.136260818, 0.136260818, 0.136260818], degree=3))
            ThreePointArc((-21.5545197047, 16.3164929872), (-23.7400865179, -12.9318813491), (2.0184674831, -26.9583206473))
            add(Edge.make_bspline(
                [(2.214209568, -23.120175429), (2.1607511248, -24.3975335956), (2.0938221425, -25.6790059153), (2.0184674831, -26.9583206473)],
                knots=[0.2738688632, 0.2738688632, 0.2738688632, 0.2738688632, 0.2830165775, 0.2830165775, 0.2830165775, 0.2830165775], degree=3))
            ThreePointArc((2.214209568, -23.120175429), (-20.6516131077, -10.628081291), (-17.5271344034, 15.2395798985))
        make_face()
    extrude(amount=F1_DEPTH)


solid = Compound([f1.part, f1b.part, f1c.part, f1d.part, f1e.part, f1f.part, f1g.part])
